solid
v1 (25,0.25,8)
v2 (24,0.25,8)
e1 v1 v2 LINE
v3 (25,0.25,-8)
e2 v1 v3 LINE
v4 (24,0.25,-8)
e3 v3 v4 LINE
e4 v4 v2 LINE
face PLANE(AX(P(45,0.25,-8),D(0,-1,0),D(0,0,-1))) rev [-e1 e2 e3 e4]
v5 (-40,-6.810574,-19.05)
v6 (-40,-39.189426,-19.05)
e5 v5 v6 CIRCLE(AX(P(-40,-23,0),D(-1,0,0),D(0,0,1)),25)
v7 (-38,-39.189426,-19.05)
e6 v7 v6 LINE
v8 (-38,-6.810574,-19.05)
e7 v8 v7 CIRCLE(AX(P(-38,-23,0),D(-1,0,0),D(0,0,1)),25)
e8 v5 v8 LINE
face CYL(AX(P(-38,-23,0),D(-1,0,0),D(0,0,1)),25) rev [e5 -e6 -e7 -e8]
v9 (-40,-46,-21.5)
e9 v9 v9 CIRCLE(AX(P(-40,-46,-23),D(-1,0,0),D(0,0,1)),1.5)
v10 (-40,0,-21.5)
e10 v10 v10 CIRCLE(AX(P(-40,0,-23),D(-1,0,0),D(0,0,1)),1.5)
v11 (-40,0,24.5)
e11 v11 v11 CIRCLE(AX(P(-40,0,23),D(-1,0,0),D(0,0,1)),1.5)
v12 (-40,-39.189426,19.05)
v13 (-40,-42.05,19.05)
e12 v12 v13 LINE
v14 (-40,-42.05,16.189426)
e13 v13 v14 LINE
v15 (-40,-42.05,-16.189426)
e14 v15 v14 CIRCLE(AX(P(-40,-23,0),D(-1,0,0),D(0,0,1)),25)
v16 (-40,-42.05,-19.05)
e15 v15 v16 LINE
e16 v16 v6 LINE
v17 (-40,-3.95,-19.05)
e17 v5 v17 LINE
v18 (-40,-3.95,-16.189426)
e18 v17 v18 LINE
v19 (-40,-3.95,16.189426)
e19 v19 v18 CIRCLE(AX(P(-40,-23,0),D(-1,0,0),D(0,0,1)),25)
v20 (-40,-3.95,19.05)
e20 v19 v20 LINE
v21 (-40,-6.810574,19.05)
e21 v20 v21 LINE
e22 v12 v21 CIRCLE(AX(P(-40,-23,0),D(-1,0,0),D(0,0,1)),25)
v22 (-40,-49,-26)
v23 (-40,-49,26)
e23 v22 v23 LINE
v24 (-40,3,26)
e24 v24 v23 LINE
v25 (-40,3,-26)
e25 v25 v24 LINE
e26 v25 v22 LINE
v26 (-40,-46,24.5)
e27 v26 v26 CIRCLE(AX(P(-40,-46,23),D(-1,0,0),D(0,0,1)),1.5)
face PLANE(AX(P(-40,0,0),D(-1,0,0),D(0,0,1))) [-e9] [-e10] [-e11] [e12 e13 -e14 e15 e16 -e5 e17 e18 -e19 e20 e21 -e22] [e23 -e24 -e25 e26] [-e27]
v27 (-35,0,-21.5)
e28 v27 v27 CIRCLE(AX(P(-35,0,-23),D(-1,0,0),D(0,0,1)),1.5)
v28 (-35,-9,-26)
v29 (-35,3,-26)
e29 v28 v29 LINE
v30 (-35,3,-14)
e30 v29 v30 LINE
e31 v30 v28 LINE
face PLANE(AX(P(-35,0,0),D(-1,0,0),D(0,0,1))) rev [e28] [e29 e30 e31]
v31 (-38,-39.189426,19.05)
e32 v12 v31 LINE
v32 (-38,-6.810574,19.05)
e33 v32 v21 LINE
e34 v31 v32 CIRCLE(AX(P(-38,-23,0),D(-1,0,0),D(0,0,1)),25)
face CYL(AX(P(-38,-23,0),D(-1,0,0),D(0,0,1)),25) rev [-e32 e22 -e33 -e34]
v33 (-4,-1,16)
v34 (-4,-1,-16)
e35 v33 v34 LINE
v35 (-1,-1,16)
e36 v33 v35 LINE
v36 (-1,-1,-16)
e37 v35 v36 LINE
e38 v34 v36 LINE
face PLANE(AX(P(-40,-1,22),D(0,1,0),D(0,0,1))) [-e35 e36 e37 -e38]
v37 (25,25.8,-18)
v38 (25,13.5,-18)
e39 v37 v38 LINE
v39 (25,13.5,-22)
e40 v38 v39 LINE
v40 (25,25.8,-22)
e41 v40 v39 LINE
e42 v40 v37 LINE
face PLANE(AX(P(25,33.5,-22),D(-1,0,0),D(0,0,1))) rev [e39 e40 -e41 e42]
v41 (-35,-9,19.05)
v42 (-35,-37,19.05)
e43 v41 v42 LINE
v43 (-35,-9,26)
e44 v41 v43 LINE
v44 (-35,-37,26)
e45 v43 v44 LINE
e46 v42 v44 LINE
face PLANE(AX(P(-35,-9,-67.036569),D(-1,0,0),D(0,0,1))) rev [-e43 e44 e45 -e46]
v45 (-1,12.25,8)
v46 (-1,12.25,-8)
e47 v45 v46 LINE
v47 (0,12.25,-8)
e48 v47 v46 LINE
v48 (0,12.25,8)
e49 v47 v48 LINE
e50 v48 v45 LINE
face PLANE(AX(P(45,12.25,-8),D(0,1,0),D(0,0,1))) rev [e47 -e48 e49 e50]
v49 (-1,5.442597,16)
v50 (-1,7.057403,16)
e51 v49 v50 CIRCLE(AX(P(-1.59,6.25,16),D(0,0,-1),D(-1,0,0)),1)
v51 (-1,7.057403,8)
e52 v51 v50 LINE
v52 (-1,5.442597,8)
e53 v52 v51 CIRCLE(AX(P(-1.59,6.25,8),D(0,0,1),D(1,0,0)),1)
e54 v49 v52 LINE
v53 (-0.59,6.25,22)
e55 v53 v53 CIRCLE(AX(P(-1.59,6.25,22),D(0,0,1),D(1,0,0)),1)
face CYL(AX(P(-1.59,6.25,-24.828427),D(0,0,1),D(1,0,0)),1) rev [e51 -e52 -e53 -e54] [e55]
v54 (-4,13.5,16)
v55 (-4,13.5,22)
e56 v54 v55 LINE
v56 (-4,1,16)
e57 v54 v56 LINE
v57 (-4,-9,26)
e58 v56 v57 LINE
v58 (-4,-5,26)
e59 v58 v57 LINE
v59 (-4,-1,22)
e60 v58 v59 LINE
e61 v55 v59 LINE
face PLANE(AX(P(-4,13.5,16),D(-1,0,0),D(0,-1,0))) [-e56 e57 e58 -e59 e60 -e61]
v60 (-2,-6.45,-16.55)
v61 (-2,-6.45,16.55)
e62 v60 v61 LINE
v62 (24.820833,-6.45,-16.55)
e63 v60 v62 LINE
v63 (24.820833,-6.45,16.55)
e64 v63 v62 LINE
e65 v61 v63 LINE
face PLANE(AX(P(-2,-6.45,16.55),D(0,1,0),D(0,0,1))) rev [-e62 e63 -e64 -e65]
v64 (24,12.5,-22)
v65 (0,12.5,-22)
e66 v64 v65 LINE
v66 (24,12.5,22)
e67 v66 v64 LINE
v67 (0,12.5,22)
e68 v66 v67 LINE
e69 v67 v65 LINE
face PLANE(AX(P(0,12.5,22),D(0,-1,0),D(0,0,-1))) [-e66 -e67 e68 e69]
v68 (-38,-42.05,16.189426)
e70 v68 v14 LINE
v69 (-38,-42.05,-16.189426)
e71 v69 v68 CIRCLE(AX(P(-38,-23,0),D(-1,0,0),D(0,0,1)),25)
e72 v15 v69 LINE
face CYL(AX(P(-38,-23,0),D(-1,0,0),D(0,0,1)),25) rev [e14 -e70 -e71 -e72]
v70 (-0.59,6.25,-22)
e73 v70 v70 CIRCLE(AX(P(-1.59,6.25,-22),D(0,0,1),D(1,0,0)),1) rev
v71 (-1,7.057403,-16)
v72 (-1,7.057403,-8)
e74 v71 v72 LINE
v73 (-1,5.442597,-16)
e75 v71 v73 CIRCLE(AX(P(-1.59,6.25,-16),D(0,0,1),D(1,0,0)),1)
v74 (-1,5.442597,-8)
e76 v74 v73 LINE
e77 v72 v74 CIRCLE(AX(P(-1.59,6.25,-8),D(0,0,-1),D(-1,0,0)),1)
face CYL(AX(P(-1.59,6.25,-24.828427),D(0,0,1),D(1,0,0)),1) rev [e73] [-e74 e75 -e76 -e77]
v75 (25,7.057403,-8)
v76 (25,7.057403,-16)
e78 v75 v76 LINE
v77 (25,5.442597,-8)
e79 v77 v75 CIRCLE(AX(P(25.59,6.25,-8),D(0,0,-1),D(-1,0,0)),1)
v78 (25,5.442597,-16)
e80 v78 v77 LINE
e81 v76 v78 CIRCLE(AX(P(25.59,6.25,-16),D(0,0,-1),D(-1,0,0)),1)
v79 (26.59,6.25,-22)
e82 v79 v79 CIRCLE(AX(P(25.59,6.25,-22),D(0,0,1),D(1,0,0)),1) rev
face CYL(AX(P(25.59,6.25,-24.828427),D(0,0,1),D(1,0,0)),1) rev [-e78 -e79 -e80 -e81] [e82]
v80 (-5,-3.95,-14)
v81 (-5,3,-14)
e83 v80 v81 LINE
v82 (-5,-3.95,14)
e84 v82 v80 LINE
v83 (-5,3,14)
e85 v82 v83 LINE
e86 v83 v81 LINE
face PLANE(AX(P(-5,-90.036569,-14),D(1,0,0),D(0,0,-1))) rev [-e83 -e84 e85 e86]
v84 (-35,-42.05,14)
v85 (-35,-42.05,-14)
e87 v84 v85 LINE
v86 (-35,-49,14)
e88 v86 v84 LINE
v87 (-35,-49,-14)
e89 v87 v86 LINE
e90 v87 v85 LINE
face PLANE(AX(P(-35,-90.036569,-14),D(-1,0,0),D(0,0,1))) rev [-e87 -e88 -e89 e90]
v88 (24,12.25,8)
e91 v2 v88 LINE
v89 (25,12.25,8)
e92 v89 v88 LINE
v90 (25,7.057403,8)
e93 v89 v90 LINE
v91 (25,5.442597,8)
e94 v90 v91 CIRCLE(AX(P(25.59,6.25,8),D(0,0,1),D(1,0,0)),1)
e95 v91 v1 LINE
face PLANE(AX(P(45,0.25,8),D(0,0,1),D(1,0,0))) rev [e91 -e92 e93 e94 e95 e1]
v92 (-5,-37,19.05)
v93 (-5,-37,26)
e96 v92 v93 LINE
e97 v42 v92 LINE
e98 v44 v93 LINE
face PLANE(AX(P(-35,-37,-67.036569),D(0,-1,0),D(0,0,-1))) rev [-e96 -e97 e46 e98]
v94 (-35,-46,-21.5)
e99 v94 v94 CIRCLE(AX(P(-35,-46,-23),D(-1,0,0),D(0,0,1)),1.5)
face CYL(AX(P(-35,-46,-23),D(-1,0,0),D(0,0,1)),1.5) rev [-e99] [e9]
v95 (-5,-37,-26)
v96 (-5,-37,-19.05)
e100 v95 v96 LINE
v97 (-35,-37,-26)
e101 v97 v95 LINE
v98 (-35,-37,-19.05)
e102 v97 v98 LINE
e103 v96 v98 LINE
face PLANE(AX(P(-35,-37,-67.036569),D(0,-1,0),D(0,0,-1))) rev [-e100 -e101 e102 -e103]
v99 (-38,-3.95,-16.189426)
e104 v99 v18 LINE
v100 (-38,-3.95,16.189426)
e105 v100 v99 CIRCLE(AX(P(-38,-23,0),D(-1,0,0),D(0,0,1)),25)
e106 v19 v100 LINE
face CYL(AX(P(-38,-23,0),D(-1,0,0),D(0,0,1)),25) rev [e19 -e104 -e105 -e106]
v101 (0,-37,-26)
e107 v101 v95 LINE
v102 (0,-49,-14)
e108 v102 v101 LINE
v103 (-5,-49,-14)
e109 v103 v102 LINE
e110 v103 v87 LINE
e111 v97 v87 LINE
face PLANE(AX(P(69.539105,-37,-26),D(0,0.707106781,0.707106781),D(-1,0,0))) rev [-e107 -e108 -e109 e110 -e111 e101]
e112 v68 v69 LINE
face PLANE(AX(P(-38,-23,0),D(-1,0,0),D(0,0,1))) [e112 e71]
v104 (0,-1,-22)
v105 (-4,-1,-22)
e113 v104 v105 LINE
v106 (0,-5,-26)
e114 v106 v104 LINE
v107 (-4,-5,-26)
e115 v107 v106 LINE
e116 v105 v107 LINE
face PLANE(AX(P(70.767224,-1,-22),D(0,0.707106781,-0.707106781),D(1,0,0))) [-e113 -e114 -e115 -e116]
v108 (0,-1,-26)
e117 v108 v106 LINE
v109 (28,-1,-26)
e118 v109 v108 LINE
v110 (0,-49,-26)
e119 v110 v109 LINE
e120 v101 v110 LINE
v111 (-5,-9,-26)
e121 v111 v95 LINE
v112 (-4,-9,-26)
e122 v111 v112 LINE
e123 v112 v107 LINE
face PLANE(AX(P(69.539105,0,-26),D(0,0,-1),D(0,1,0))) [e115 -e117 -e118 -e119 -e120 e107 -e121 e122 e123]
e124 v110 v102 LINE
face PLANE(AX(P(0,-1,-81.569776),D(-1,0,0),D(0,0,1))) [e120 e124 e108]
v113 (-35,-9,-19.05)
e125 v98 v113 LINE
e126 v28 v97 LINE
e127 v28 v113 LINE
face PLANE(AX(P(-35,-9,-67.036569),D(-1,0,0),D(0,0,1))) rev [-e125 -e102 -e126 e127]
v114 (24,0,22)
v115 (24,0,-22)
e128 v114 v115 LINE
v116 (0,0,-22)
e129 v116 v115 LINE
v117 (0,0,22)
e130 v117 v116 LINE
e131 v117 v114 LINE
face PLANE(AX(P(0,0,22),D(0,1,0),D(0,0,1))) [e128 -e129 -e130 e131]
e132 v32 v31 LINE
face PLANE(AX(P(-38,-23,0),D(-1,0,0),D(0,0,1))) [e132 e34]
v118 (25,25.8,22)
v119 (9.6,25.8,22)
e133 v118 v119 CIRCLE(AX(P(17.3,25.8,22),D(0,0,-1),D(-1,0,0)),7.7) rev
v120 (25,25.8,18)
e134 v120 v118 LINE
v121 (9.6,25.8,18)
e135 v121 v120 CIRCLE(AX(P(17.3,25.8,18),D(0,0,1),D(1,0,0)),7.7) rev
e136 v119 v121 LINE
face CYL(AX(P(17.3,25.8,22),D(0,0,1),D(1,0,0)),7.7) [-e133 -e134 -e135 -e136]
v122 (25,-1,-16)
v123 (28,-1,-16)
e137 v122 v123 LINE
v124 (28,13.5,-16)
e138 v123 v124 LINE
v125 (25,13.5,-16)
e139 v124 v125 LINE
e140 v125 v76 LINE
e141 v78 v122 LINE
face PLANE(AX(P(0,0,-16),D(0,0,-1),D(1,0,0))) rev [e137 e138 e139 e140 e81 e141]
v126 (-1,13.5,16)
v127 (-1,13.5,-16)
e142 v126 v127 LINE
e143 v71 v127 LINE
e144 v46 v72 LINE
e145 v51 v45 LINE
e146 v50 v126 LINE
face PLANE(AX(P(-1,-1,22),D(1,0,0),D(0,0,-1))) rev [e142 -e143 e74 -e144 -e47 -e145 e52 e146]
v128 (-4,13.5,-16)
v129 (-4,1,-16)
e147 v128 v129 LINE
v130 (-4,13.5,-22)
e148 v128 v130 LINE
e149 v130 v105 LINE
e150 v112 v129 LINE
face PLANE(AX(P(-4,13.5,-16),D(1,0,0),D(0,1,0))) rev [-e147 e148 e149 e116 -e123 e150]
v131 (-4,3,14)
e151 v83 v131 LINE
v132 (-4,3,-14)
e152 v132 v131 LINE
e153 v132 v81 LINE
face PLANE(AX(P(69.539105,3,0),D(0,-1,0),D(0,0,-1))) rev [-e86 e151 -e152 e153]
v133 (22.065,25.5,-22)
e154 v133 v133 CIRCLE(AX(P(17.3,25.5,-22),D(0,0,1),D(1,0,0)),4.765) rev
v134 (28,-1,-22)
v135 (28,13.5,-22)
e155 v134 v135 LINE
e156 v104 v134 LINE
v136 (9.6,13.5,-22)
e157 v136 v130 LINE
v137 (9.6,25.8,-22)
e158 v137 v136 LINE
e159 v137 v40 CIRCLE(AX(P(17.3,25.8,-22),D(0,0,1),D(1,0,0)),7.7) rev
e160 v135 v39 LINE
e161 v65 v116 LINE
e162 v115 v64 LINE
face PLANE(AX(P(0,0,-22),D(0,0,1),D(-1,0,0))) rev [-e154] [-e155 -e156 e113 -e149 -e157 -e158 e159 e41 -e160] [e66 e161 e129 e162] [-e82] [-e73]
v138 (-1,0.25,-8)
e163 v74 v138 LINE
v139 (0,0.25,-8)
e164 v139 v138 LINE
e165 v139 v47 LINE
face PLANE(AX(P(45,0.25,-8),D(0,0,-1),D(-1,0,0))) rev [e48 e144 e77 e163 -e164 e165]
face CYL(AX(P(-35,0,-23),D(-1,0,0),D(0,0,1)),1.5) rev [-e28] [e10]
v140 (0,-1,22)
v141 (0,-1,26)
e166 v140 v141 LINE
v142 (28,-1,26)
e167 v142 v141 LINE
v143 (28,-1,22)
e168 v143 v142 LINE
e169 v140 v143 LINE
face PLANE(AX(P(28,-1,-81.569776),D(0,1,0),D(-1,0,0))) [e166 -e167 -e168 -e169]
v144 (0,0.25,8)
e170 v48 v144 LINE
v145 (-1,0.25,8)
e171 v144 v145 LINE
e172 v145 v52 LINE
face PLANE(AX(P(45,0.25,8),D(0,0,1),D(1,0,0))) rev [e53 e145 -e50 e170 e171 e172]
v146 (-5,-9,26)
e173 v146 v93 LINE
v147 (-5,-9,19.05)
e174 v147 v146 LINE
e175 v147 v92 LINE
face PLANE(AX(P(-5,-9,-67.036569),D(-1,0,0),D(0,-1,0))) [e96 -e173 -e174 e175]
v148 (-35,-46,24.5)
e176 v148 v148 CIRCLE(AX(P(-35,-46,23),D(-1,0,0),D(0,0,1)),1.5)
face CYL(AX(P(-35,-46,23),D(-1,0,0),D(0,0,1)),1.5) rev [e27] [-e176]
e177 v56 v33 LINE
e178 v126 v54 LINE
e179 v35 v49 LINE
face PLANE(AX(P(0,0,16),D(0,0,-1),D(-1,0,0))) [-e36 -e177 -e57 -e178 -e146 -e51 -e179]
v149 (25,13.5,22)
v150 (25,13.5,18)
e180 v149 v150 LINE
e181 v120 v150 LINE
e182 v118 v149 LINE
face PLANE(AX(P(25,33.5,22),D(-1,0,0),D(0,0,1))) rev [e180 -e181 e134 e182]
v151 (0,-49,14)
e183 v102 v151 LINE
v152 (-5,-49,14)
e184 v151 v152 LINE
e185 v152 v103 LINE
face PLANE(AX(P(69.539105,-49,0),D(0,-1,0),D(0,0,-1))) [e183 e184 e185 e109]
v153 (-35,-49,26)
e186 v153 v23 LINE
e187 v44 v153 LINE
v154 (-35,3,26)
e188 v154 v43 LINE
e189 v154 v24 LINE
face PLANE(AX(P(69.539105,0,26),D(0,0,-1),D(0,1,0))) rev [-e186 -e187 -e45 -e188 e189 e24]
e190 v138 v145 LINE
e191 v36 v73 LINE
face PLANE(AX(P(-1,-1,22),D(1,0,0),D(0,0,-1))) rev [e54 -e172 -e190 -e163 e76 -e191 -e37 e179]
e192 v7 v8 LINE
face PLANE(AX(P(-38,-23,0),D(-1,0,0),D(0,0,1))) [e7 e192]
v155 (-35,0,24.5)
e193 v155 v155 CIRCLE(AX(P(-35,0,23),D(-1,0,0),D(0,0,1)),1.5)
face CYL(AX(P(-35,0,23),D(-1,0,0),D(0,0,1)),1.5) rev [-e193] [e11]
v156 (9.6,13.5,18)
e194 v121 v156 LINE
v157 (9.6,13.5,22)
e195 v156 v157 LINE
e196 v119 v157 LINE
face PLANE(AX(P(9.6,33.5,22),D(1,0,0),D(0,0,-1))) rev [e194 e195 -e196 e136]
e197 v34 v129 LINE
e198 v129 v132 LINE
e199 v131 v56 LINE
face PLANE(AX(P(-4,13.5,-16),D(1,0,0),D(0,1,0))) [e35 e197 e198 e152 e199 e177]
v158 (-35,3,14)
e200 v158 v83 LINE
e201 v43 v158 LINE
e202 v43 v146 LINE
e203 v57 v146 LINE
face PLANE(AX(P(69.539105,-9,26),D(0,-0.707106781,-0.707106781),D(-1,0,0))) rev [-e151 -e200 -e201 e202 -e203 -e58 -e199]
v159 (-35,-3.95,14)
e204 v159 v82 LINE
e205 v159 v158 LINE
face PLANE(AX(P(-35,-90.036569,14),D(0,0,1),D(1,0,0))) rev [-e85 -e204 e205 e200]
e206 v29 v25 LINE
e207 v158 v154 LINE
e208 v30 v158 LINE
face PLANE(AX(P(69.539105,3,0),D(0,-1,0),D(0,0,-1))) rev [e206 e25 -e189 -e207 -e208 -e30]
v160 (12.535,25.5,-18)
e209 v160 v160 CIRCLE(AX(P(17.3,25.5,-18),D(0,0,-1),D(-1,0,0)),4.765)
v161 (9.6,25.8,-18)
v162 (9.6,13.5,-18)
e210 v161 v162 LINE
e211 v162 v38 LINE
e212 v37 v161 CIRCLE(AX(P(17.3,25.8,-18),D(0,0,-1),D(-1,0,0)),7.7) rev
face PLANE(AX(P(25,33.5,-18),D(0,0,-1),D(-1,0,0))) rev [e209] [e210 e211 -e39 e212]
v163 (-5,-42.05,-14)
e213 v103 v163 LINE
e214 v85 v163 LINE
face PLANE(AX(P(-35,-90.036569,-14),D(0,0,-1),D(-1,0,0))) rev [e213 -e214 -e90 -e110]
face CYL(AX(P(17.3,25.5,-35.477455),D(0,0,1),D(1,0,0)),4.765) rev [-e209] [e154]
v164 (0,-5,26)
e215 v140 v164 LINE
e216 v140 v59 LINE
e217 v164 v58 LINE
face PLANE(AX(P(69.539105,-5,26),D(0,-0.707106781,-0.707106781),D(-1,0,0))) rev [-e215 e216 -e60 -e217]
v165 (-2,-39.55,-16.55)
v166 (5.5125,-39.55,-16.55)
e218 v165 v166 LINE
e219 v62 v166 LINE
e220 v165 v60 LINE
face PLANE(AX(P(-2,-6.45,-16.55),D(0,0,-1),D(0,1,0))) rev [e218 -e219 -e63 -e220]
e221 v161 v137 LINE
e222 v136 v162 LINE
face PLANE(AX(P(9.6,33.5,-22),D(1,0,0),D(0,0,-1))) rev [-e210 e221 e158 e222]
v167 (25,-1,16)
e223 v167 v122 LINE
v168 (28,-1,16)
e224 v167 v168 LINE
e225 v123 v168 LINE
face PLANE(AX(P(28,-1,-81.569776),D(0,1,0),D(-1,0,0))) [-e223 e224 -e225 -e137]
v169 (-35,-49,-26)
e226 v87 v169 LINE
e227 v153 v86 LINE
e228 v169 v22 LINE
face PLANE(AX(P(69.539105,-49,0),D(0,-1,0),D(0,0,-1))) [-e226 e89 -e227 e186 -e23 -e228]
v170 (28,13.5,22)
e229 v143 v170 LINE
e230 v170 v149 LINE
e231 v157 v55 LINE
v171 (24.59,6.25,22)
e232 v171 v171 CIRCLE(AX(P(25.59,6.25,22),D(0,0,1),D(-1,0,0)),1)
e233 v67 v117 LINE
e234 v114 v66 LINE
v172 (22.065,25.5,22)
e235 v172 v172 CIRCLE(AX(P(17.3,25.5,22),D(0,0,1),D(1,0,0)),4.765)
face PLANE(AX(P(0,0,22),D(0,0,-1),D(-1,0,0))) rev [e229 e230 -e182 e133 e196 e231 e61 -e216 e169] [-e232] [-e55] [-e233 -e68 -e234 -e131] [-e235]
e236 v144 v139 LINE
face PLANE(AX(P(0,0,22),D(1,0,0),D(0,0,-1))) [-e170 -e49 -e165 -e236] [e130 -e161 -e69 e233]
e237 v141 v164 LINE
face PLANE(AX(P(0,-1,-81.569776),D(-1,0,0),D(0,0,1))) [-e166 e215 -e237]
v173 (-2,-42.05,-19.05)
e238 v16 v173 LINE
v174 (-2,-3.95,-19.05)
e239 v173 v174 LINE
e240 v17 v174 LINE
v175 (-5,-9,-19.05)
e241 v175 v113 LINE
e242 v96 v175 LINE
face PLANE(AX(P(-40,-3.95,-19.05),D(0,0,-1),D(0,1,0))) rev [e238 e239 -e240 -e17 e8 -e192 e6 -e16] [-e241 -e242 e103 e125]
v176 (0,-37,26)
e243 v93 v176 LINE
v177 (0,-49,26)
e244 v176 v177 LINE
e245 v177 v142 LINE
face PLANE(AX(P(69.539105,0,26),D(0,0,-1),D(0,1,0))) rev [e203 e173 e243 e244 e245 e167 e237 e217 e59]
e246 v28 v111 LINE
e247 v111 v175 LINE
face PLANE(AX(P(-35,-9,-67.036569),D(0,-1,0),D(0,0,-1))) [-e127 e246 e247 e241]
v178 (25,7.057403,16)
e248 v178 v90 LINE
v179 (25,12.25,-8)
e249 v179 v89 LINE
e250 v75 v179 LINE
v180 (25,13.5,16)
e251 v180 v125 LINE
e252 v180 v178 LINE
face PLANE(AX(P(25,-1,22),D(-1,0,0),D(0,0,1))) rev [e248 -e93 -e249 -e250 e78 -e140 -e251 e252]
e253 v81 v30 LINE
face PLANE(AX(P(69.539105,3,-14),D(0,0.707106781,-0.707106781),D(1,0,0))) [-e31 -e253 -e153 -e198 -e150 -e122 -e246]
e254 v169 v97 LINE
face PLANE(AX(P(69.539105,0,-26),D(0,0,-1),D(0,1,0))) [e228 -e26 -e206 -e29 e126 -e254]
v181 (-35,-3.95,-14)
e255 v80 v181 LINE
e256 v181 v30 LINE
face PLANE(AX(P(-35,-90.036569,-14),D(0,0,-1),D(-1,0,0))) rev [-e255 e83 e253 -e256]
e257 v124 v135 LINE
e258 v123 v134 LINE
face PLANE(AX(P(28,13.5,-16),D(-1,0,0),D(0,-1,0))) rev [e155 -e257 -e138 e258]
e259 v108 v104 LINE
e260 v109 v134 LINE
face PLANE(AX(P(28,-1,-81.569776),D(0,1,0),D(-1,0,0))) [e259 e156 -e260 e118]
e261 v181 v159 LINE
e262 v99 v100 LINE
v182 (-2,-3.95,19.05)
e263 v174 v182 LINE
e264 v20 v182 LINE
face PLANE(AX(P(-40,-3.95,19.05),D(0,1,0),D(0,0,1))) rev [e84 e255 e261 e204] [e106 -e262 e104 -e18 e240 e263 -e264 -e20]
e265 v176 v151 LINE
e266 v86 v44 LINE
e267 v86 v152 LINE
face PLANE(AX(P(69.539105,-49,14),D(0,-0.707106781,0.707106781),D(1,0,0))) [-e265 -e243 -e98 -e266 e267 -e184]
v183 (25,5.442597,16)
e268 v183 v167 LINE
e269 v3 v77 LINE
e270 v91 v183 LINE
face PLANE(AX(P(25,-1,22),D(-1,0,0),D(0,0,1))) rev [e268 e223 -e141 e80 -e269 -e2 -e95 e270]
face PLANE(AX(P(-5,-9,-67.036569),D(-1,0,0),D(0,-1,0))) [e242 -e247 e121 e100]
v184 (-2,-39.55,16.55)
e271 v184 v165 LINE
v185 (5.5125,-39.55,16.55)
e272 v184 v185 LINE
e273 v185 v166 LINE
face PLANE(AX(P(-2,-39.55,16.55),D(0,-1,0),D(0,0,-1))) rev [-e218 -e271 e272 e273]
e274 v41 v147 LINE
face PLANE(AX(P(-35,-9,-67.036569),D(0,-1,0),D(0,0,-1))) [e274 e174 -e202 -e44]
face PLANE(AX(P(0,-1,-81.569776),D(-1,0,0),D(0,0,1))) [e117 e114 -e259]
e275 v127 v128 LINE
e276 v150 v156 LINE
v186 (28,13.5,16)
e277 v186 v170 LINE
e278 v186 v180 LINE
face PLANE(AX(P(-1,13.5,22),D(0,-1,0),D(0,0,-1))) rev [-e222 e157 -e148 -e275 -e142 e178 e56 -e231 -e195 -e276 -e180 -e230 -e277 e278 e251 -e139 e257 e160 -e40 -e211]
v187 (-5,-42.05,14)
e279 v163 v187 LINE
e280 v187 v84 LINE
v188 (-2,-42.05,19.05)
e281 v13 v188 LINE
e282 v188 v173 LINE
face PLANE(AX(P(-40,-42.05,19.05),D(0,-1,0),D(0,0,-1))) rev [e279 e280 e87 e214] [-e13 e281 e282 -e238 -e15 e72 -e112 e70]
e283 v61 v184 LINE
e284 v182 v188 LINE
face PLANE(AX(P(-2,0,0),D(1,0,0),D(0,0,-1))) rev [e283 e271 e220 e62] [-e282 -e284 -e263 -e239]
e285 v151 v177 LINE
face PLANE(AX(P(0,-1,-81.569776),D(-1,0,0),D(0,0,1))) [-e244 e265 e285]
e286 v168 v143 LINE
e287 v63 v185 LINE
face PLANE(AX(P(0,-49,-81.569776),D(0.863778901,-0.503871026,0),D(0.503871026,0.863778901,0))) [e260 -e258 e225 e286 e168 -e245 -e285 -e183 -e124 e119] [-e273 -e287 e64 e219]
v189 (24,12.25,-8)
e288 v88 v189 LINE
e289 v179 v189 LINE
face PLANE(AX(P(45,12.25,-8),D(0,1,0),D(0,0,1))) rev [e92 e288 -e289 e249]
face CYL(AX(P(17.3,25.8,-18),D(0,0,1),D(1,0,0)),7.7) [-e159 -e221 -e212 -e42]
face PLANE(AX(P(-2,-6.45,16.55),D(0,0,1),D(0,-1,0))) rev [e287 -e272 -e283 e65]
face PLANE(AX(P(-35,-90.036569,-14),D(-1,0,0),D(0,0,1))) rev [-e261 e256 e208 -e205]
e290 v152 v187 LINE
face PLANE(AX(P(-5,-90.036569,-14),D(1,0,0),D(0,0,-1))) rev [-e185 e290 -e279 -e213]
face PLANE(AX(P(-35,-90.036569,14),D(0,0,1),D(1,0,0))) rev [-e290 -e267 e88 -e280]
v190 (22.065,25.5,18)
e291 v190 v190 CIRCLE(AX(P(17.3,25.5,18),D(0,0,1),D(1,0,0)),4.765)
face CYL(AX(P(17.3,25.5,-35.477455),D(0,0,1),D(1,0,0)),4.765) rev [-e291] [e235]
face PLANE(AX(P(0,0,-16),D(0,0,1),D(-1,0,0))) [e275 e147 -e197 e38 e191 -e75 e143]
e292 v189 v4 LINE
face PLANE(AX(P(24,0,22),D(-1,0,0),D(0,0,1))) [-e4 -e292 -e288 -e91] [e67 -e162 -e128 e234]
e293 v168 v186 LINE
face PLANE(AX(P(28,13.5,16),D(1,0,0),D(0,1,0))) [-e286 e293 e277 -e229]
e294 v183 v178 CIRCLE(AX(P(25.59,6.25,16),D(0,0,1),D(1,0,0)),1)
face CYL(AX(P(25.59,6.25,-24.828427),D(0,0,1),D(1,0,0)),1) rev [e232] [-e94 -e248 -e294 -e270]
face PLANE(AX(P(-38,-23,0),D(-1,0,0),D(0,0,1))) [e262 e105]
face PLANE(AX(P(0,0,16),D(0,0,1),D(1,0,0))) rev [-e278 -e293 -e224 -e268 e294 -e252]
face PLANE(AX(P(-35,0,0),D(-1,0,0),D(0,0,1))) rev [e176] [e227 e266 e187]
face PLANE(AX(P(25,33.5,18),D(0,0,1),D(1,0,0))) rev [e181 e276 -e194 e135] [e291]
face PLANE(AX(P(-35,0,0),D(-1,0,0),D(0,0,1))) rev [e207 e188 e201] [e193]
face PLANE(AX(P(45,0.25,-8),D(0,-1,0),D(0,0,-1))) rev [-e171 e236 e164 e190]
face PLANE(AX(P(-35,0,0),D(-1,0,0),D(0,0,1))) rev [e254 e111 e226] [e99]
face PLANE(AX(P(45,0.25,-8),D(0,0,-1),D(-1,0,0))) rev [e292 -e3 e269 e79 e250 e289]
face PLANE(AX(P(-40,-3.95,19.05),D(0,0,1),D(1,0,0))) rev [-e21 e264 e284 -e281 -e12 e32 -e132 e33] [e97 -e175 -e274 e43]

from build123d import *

# Parameters (mm, degrees)
SKETCH1_W            = 26
SKETCH1_H            = 14.5
SKETCH1_W_2          = 24
SKETCH1_H_2          = 12.5
BOSS_EXTRUDE1_DEPTH  = 22
SKETCH2_W            = 3
SKETCH2_H            = 14.5
BOSS_EXTRUDE2_DEPTH  = 6
CUT_EXTRUDE1_REACH   = 40.823
SKETCH3_W            = 16
SKETCH3_H            = 12
CUT_EXTRUDE2_REACH   = 55.873
SKETCH4_R            = 1
SKETCH5_W            = 44
SKETCH5_H            = 44
SKETCH5_W_2          = 38.1
SKETCH5_H_2          = 38.1
BOSS_EXTRUDE3_DEPTH  = 40
SKETCH8_W            = 52
SKETCH8_H            = 52
SKETCH8_W_2          = 44
SKETCH8_H_2          = 44
BOSS_EXTRUDE5_DEPTH  = 36
SKETCH6_R            = 25
CUT_EXTRUDE5_DEPTH   = 2
BOSS_EXTRUDE6_DEPTH  = 4
CHAMFER1_SIZE        = 12
CUT_EXTRUDE7_REACH   = 83.884
SKETCH11_W           = 30
SKETCH11_H           = 28
CUT_EXTRUDE8_REACH   = 72.569
SKETCH12_W           = 30
SKETCH12_H           = 28
CHAMFER3_SIZE        = 4
SKETCH14_R           = 1.5
BOSS_EXTRUDE7_DEPTH  = 5
SKETCH15_W           = 38.1
SKETCH15_H           = 38.1
SKETCH15_W_2         = 33.1
SKETCH15_H_2         = 33.1
BOSS_EXTRUDE8_DEPTH  = 2
SKETCH16_W           = 15.4
SKETCH16_H           = 4
BOSS_EXTRUDE9_DEPTH  = 20
CUT_EXTRUDE10_START  = -44
SKETCH18_R           = 4.765
CUT_EXTRUDE10_DEPTH  = 44
FILLET4_RADIUS       = 7.7
FILLET4_LENGTH       = 4
FILLET5_RADIUS       = 7.7
FILLET5_LENGTH       = 4
BOSS_EXTRUDE10_REACH = 83.884
CUT_EXTRUDE12_REACH  = 70.389
SKETCH15_3_W         = 33.1
SKETCH15_3_H         = 33.1


# Some blends are built 0.0001 mm under size
with BuildPart() as part:
    # Sketch1 → Boss-Extrude1 (new body)
    with BuildSketch(Plane.XY):
        with Locations((12, 6.25)):
            Rectangle(SKETCH1_W, SKETCH1_H)
        with Locations((12, 6.25)):
            Rectangle(SKETCH1_W_2, SKETCH1_H_2, mode=Mode.SUBTRACT)
    boss_extrude1 = extrude(amount=BOSS_EXTRUDE1_DEPTH)

    # Sketch2 → Boss-Extrude2 (add)
    with BuildSketch(Plane.XY.offset(22)):
        with Locations((-2.5, 6.25)):
            Rectangle(SKETCH2_W, SKETCH2_H)
        with Locations((26.5, 6.25)):
            Rectangle(SKETCH2_W, SKETCH2_H)
    boss_extrude2 = extrude(amount=-BOSS_EXTRUDE2_DEPTH)

    # Mirror2: Boss-Extrude1, Boss-Extrude2 across plane
    add(boss_extrude1.mirror(Plane(origin=(0, 0, 0), x_dir=(1, 0, 0), z_dir=(0, 0, -1))))
    add(boss_extrude2.mirror(Plane(origin=(0, 0, 0), x_dir=(1, 0, 0), z_dir=(0, 0, -1))))

    # Cut-Extrude1: up to this face of the body (flat: up to its plane)
    cut_extrude1_end = Plane(part.part.faces().sort_by_distance((25, 6.25, 0))[0])
    # Sketch3 → Cut-Extrude1 (cut, up to the picked face)
    with BuildSketch(Plane.ZY.offset(1), mode=Mode.PRIVATE) as cut_extrude1_sk1:
        with Locations((0, 6.25)):
            Rectangle(SKETCH3_W, SKETCH3_H)
    cut_extrude1_tool1 = split(extrude(cut_extrude1_sk1.sketch, amount=-CUT_EXTRUDE1_REACH, mode=Mode.PRIVATE), bisect_by=cut_extrude1_end, keep=Keep.BOTH, mode=Mode.PRIVATE)
    add(cut_extrude1_tool1.solids().sort_by(Axis((-1, 6.25, 0), (1, 0, 0)))[0], mode=Mode.SUBTRACT)

    # Sketch4 → Cut-Extrude2 (cut, up to next)
    with BuildSketch(Plane.XY.offset(22), mode=Mode.PRIVATE) as cut_extrude2_sk1:
        with Locations((-1.59, 6.25)):
            Circle(SKETCH4_R)
    cut_extrude2_tool1 = extrude(cut_extrude2_sk1.sketch, amount=-CUT_EXTRUDE2_REACH, mode=Mode.PRIVATE) & part.part
    # Sketch4 → Cut-Extrude2 (cut, up to next)
    with BuildSketch(Plane.XY.offset(22), mode=Mode.PRIVATE) as cut_extrude2_sk2:
        with Locations(Location((25.59, 6.25, 0), (0, 0, 233.842991799))):
            Circle(SKETCH4_R)
    cut_extrude2_tool2 = extrude(cut_extrude2_sk2.sketch, amount=-CUT_EXTRUDE2_REACH, mode=Mode.PRIVATE) & part.part
    add(cut_extrude2_tool1.solids().sort_by_distance((-1.59, 6.25, 22))[0], mode=Mode.SUBTRACT)
    add(cut_extrude2_tool1.solids().sort_by_distance((-1.59, 6.25, 22))[1], mode=Mode.SUBTRACT)
    add(cut_extrude2_tool2.solids().sort_by_distance((25.59, 6.25, 22))[0], mode=Mode.SUBTRACT)
    add(cut_extrude2_tool2.solids().sort_by_distance((25.59, 6.25, 22))[1], mode=Mode.SUBTRACT)

    # Sketch5 → Boss-Extrude3 (add)
    with BuildSketch(Plane(origin=(0, 0, 0), x_dir=(0, 0, -1), z_dir=(1, 0, 0))):
        with Locations((0, -23)):
            Rectangle(SKETCH5_W, SKETCH5_H)
        with Locations((0, -23)):
            Rectangle(SKETCH5_W_2, SKETCH5_H_2, mode=Mode.SUBTRACT)
    extrude(amount=-BOSS_EXTRUDE3_DEPTH)

    # Sketch8 → Boss-Extrude5 (add)
    with BuildSketch(Plane.ZY.offset(40)):
        with Locations((0, -23)):
            Rectangle(SKETCH8_W, SKETCH8_H)
        with Locations((0, -23)):
            Rectangle(SKETCH8_W_2, SKETCH8_H_2, mode=Mode.SUBTRACT)
    extrude(amount=-BOSS_EXTRUDE5_DEPTH)

    # Sketch6 → Cut-Extrude5 (cut)
    with BuildSketch(Plane.ZY.offset(40)):
        with Locations((0, -23)):
            Circle(SKETCH6_R)
    extrude(amount=-CUT_EXTRUDE5_DEPTH, mode=Mode.SUBTRACT)

    # Sketch9 → Boss-Extrude6 (add)
    with BuildSketch(Plane(origin=(-4, 0, 0), x_dir=(0, 0, -1), z_dir=(1, 0, 0))):
        Polygon((-26, -49), (26, -49), (26, -1), (22, -1), (22, -45), (-22, -45), (-22, -1), (-26, -1), align=None)
    extrude(amount=BOSS_EXTRUDE6_DEPTH)

    # Chamfer1
    # the kernel refuses this chamfer: 12 mm, written as the material it takes off along each edge
    with BuildSketch(Plane(origin=(-70.860195856, 3, 26), x_dir=(0, 0.027495876610586382, -0.9996219169112968), z_dir=(1, 0, 0))) as chamfer1_piece_1:
        Polygon((CHAMFER1_SIZE * 0.999621916911, -CHAMFER1_SIZE * 0.0274958766106), (-CHAMFER1_SIZE * 0.0274958766106, -CHAMFER1_SIZE * 0.999621916911), (0, 0), align=None)
    extrude(amount=66.860195856, mode=Mode.SUBTRACT)
    with BuildSketch(Plane(origin=(30.860195856, -49, 26), x_dir=(0, -0.027495876610586202, -0.9996219169112968), z_dir=(-1, 0, 0)), Plane(origin=(-70.860195856, -49, -26), x_dir=(0, -0.027495876610586202, 0.9996219169112968), z_dir=(1, 0, 0))) as chamfer1_piece_2:
        Polygon((CHAMFER1_SIZE * 0.999621916911, -CHAMFER1_SIZE * 0.0274958766106), (-CHAMFER1_SIZE * 0.0274958766106, -CHAMFER1_SIZE * 0.999621916911), (0, 0), align=None)
    extrude(amount=101.720391711, mode=Mode.SUBTRACT)
    with BuildSketch(Plane(origin=(-70.860195856, 3, -26), x_dir=(0, 0.027495876610586382, 0.9996219169112968), z_dir=(1, 0, 0))) as chamfer1_piece_3:
        Polygon((CHAMFER1_SIZE * 0.999621916911, CHAMFER1_SIZE * 0.0274958766106), (-CHAMFER1_SIZE * 0.0274958766106, CHAMFER1_SIZE * 0.999621916911), (0, 0), align=None)
    extrude(amount=66.860195856, mode=Mode.SUBTRACT)

    # Cut-Extrude7: up to this face of the body (flat: up to its plane)
    cut_extrude7_end = Plane(part.part.faces().sort_by_distance((-19.5, -22.5, -26))[0])
    # Sketch11 → Cut-Extrude7 (cut, up to the picked face)
    with BuildSketch(Plane.XY.offset(26), mode=Mode.PRIVATE) as cut_extrude7_sk1:
        with Locations((-20, -23)):
            Rectangle(SKETCH11_W, SKETCH11_H)
    cut_extrude7_tool1 = split(extrude(cut_extrude7_sk1.sketch, amount=-CUT_EXTRUDE7_REACH, mode=Mode.PRIVATE), bisect_by=cut_extrude7_end, keep=Keep.BOTH, mode=Mode.PRIVATE)
    add(cut_extrude7_tool1.solids().sort_by(Axis((-20, -23, 26), (0, 0, -1)))[0], mode=Mode.SUBTRACT)

    # Cut-Extrude8: up to this face of the body (flat: up to its plane)
    cut_extrude8_end = Plane(part.part.faces().sort_by_distance((-20, -49, 0))[0])
    # Sketch12 → Cut-Extrude8 (cut, up to the picked face)
    with BuildSketch(Plane(origin=(0, 3, 0), x_dir=(1, 0, 0), z_dir=(0, 1, 0)), mode=Mode.PRIVATE) as cut_extrude8_sk1:
        with Locations((-20, 0)):
            Rectangle(SKETCH12_W, SKETCH12_H)
    cut_extrude8_tool1 = split(extrude(cut_extrude8_sk1.sketch, amount=-CUT_EXTRUDE8_REACH, mode=Mode.PRIVATE), bisect_by=cut_extrude8_end, keep=Keep.BOTH, mode=Mode.PRIVATE)
    add(cut_extrude8_tool1.solids().sort_by(Axis((-20, 3, 0), (0, -1, 0)))[0], mode=Mode.SUBTRACT)

    # Chamfer3
    chamfer3_edges = [part.edges().sort_by_distance(p)[0] for p in [
        (-2, -1, -26),
        (-2, -1, 26),
    ]]
    chamfer(chamfer3_edges, length=CHAMFER3_SIZE - 0.0001)  # a hair under: the kernel refuses the full size

    # Sketch14 → Boss-Extrude7 (add)
    # profile 1 of 4: a face of its own
    with BuildSketch(Plane.ZY.offset(40)):
        Polygon((-26, 3), (-14, 3), (-26, -9), align=None)
        with Locations((-23, 0)):
            Circle(SKETCH14_R, mode=Mode.SUBTRACT)
    # profile 2 of 4: a face of its own
    with BuildSketch(Plane.ZY.offset(40)):
        Polygon((14, 3), (26, -9), (26, 3), align=None)
        with Locations((23, 0)):
            Circle(SKETCH14_R, mode=Mode.SUBTRACT)
    # profile 3 of 4: a face of its own
    with BuildSketch(Plane.ZY.offset(40)):
        Polygon((26, -49), (14, -49), (26, -37), align=None)
        with Locations((23, -46)):
            Circle(SKETCH14_R, mode=Mode.SUBTRACT)
    # profile 4 of 4: a face of its own
    with BuildSketch(Plane.ZY.offset(40)):
        Polygon((-26, -49), (-26, -37), (-14, -49), align=None)
        with Locations((-23, -46)):
            Circle(SKETCH14_R, mode=Mode.SUBTRACT)
    extrude(amount=-BOSS_EXTRUDE7_DEPTH)

    # Sketch15 → Boss-Extrude8 (add)
    with BuildSketch(Plane(origin=(0, 0, 0), x_dir=(0, 0, -1), z_dir=(1, 0, 0))):
        with Locations((0, -23)):
            Rectangle(SKETCH15_W, SKETCH15_H)
        with Locations((0, -23)):
            Rectangle(SKETCH15_W_2, SKETCH15_H_2, mode=Mode.SUBTRACT)
    extrude(amount=-BOSS_EXTRUDE8_DEPTH)

    # Sketch16 → Boss-Extrude9 (add)
    with BuildSketch(Plane(origin=(0, 13.5, 0), x_dir=(1, 0, 0), z_dir=(0, 1, 0))):
        with Locations((17.3, -20)):
            Rectangle(SKETCH16_W, SKETCH16_H)
        with Locations((17.3, 20)):
            Rectangle(SKETCH16_W, SKETCH16_H)
    extrude(amount=BOSS_EXTRUDE9_DEPTH)

    # Sketch18 → Cut-Extrude10 (cut)
    with BuildSketch(Plane.XY.offset(22).offset(CUT_EXTRUDE10_START)):
        with Locations((17.3, 25.5)):
            Circle(SKETCH18_R)
    extrude(amount=CUT_EXTRUDE10_DEPTH, mode=Mode.SUBTRACT)

    # Fillet4: full round fillet: the end face becomes a half cylinder, R = half its width
    fillet4_face = Plane((17.3, 33.5, 20), x_dir=(0, 0, -1), z_dir=(0, 1, 0))  # on the end face: x along it, z out of the body
    fillet4_slab = fillet4_face.offset(-FILLET4_RADIUS / 2) * Box(FILLET4_LENGTH, 2 * FILLET4_RADIUS, FILLET4_RADIUS, mode=Mode.PRIVATE)  # the body's end, R deep
    fillet4_round = Plane((17.3, 25.8, 20), x_dir=(0, 1, 0), z_dir=(0, 0, -1)) * Cylinder(FILLET4_RADIUS, FILLET4_LENGTH, mode=Mode.PRIVATE)  # its axis R under the face
    add(fillet4_slab - fillet4_round, mode=Mode.SUBTRACT)

    # Fillet5: full round fillet: the end face becomes a half cylinder, R = half its width
    fillet5_face = Plane((17.3, 33.5, -20), x_dir=(0, 0, -1), z_dir=(0, 1, 0))  # on the end face: x along it, z out of the body
    fillet5_slab = fillet5_face.offset(-FILLET5_RADIUS / 2) * Box(FILLET5_LENGTH, 2 * FILLET5_RADIUS, FILLET5_RADIUS, mode=Mode.PRIVATE)  # the body's end, R deep
    fillet5_round = Plane((17.3, 25.8, -20), x_dir=(0, 1, 0), z_dir=(0, 0, -1)) * Cylinder(FILLET5_RADIUS, FILLET5_LENGTH, mode=Mode.PRIVATE)  # its axis R under the face
    add(fillet5_slab - fillet5_round, mode=Mode.SUBTRACT)

    # Boss-Extrude10: up to this face of the body (flat: up to its plane)
    boss_extrude10_end = Plane(part.part.faces().sort_by_distance((-2.448716798, -21.358932413, -26))[0])
    # Sketch19 → Boss-Extrude10 (add, up to the picked face)
    with BuildSketch(Plane.XY.offset(26), mode=Mode.PRIVATE) as boss_extrude10_sk1:
        Polygon((0, -49), (28, -1), (0, -1), align=None)
    boss_extrude10_tool1 = split(extrude(boss_extrude10_sk1.sketch, amount=-BOSS_EXTRUDE10_REACH, mode=Mode.PRIVATE), bisect_by=boss_extrude10_end, keep=Keep.BOTH, mode=Mode.PRIVATE)
    add(boss_extrude10_tool1.solids().sort_by(Axis((9.333333, -17, 26), (0, 0, -1)))[0])

    # Cut-Extrude12: up to this face of the body (flat: up to its plane)
    cut_extrude12_end = Plane(part.part.faces().sort_by_distance((14, -25, 0))[0])
    # Sketch15<3> → Cut-Extrude12 (cut, up to the picked face)
    with BuildSketch(Plane(origin=(0, 0, 0), x_dir=(0, 0, -1), z_dir=(1, 0, 0)), mode=Mode.PRIVATE) as cut_extrude12_sk1:
        with Locations((0, -23)):
            Rectangle(SKETCH15_3_W, SKETCH15_3_H)
    cut_extrude12_tool1 = split(extrude(cut_extrude12_sk1.sketch, amount=CUT_EXTRUDE12_REACH, mode=Mode.PRIVATE), bisect_by=cut_extrude12_end, keep=Keep.BOTH, mode=Mode.PRIVATE)
    add(cut_extrude12_tool1.solids().sort_by(Axis((0, -23, 0), (1, 0, 0)))[0], mode=Mode.SUBTRACT)


solid = part.part
